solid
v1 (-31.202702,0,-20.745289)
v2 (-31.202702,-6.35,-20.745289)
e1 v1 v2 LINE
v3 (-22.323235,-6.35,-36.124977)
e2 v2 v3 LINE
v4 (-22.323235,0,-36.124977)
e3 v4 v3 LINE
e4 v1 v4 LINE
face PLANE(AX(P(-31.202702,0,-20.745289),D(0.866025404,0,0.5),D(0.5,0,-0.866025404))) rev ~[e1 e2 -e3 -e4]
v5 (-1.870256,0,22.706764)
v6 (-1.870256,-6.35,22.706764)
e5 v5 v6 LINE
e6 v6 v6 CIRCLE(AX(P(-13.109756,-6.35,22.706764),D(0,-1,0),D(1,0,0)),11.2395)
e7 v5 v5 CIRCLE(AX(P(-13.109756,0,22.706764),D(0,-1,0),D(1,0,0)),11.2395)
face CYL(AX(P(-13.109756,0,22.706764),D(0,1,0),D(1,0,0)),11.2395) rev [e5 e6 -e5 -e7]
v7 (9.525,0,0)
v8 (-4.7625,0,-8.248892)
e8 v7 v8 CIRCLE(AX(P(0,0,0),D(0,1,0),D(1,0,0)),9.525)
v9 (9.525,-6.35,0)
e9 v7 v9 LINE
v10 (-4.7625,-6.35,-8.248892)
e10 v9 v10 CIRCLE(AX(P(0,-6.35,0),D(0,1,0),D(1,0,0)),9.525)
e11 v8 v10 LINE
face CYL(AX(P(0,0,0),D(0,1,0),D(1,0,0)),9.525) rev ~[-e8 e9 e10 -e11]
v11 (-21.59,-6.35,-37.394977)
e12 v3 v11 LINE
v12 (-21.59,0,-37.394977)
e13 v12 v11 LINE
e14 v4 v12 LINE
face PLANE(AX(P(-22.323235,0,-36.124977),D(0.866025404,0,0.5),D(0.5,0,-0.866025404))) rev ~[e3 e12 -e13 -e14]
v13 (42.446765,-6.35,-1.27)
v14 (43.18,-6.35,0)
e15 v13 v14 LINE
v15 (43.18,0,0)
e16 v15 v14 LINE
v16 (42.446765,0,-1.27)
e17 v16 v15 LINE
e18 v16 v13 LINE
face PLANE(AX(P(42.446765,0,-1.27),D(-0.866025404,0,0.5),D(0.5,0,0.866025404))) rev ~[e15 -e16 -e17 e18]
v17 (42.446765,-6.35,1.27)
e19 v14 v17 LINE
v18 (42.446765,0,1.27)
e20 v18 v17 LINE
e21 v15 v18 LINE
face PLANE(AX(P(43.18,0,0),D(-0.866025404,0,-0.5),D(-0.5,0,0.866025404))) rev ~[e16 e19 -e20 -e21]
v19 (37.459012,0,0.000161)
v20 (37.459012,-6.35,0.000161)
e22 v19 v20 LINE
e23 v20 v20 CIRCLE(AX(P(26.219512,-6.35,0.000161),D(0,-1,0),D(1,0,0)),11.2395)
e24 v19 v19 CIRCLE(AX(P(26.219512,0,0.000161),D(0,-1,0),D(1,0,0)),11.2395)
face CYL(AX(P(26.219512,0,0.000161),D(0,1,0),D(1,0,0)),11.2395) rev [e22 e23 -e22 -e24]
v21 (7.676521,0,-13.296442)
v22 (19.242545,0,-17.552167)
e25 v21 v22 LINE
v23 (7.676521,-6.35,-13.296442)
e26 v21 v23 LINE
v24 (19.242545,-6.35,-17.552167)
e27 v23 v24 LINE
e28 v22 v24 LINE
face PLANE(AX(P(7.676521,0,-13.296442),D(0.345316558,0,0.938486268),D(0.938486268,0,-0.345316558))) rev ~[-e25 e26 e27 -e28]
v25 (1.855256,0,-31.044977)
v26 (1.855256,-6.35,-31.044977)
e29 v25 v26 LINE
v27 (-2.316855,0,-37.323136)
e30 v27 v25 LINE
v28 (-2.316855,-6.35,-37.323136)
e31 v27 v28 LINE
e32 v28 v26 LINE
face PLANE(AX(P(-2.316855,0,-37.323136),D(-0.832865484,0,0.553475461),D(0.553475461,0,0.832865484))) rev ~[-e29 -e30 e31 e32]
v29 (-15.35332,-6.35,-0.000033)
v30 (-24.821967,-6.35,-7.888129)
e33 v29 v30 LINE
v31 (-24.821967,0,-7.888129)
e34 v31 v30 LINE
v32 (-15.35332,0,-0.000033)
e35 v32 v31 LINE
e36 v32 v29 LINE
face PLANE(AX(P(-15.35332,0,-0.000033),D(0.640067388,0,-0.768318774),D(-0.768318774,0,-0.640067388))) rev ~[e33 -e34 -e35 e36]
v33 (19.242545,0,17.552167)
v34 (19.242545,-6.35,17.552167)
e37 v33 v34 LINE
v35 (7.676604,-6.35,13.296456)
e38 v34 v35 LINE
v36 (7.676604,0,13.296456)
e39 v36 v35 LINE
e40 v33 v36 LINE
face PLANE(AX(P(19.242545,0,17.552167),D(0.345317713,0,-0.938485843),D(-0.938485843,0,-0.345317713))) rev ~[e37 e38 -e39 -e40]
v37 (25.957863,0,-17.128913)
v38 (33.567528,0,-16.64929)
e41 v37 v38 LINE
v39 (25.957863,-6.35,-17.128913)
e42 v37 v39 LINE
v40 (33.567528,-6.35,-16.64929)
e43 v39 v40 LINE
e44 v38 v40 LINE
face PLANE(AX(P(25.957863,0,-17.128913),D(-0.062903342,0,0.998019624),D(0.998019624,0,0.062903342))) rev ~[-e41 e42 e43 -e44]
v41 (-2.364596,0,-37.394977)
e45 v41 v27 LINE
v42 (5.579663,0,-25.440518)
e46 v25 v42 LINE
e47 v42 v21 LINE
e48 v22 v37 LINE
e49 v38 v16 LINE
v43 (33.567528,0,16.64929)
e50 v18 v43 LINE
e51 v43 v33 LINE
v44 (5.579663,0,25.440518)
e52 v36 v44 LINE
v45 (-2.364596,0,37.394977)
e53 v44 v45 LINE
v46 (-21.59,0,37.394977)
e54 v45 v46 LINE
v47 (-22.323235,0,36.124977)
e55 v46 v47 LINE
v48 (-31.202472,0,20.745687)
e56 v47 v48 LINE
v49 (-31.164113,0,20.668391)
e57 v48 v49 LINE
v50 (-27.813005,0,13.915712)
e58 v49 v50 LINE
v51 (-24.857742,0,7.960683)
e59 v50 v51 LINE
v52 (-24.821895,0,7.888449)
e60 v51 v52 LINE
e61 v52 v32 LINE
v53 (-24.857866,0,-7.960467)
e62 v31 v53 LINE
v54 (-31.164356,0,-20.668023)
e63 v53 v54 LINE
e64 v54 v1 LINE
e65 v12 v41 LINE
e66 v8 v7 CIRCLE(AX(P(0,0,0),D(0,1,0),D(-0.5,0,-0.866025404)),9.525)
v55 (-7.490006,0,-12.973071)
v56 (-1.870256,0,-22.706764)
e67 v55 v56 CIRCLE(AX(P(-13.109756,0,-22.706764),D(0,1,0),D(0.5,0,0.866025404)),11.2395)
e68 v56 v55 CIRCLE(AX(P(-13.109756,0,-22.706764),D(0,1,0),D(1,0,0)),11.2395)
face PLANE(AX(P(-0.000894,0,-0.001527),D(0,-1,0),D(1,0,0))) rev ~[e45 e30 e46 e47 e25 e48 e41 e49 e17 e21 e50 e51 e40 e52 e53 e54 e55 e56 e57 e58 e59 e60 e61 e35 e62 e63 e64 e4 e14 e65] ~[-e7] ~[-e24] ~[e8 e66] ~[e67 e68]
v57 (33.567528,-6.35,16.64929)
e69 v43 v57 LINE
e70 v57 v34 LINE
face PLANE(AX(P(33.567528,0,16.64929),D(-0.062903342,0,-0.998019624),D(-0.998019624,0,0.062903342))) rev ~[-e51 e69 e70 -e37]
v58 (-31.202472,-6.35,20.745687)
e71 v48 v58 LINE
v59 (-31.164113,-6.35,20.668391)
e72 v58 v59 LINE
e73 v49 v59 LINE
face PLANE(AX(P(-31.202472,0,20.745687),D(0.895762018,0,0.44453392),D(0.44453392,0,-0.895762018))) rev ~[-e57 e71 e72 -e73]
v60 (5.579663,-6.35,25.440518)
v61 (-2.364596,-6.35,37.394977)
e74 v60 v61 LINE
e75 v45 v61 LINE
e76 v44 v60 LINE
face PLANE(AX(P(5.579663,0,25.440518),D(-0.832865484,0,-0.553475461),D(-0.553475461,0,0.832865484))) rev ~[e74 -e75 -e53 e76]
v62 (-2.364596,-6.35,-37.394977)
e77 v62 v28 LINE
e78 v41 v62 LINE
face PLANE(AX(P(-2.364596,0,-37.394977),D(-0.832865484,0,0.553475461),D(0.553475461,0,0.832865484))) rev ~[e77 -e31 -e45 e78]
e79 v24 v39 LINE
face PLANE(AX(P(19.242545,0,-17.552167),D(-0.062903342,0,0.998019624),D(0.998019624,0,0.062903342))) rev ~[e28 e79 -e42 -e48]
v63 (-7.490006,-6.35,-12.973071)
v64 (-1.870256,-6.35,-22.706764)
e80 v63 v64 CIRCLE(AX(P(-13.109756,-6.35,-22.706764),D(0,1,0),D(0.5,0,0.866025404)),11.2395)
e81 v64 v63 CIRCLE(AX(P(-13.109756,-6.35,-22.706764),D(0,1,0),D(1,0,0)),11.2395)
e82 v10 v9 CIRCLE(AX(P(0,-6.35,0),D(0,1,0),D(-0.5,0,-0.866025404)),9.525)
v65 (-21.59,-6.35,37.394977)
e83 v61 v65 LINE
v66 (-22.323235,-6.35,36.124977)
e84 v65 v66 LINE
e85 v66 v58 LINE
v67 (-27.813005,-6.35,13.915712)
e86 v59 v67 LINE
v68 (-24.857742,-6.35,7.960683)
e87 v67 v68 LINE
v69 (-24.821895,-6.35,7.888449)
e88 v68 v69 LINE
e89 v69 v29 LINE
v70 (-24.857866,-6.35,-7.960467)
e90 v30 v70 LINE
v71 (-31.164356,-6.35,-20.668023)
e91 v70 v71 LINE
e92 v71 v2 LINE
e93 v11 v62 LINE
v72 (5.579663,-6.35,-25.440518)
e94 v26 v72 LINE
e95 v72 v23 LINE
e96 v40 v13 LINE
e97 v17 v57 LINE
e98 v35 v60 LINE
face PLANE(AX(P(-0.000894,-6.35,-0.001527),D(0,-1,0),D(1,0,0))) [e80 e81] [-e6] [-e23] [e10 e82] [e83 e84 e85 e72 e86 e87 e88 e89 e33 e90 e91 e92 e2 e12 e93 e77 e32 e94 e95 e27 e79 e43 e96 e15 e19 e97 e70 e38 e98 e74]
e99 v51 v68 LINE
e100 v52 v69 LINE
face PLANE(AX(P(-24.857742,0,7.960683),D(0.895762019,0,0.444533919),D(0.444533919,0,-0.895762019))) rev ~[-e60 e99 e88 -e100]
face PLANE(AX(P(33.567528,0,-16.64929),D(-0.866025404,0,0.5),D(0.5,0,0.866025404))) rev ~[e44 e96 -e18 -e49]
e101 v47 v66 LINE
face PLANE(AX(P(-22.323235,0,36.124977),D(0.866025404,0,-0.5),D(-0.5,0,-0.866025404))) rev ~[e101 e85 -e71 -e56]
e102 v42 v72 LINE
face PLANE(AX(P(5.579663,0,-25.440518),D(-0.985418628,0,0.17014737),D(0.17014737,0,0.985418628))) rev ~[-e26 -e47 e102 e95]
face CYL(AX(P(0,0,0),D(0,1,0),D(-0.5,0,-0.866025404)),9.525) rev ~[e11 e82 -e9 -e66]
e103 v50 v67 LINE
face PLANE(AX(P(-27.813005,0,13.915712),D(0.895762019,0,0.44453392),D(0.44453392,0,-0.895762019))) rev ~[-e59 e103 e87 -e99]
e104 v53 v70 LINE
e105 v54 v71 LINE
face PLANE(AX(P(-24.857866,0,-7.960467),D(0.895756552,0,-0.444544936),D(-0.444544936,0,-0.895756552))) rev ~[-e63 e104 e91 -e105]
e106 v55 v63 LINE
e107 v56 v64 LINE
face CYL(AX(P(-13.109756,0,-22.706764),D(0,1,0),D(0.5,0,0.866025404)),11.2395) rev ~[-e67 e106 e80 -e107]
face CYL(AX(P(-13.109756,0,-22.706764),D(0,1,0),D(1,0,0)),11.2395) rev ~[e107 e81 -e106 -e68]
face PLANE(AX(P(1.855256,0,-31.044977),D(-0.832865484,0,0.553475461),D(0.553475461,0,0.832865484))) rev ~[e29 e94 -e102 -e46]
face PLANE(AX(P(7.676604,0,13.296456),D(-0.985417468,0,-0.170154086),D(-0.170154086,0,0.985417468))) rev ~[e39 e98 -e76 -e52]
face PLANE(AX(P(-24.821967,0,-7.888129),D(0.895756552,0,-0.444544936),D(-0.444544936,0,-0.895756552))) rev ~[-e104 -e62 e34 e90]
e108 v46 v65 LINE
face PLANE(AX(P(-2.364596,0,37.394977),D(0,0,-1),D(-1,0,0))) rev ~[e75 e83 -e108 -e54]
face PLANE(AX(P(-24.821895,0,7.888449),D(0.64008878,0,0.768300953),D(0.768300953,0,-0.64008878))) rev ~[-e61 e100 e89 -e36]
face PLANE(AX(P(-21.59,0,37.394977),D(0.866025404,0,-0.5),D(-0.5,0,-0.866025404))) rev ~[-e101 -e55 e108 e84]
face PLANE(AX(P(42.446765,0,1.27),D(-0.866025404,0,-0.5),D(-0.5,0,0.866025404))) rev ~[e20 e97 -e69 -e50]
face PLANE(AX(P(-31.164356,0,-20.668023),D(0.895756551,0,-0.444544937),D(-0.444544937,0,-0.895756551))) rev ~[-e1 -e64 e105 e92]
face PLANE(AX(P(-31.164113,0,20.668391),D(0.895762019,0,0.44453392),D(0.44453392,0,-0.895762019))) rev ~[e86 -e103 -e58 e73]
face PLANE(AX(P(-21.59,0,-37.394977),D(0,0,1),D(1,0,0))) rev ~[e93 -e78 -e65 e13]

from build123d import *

# Parameters (mm, degrees)
F0_R     = 11.2395
F1_DEPTH = 6.35


# Not quite as in the source:
# - ends of sketch curves that miss each other by under 0.0002 mm in the source are joined


with BuildPart() as f1:
    # F0 (on Front) → F1 (new body)
    with BuildSketch(Plane.XZ):
        with BuildLine():
            Line((42.4467651581, 1.27), (33.5675281941, 16.6492895541))
            Line((33.5675281941, 16.6492895541), (19.2425445444, 17.5521669359))
            Line((19.2425445444, 17.5521669359), (7.6766035347, 13.2964561731))
            Line((7.6766035347, 13.2964561731), (5.579663063, 25.4405181745))
            Line((5.579663063, 25.4405181745), (-2.3645964913, 37.3949769354))
            Line((-2.3645964913, 37.3949769354), (-20.1235303163, 37.3949769354))
            ThreePointArc((-20.1235303163, 37.3949769354), (-21.3935303163, 37.054681461), (-22.3232348419, 36.1249769354))
            Line((-22.3232348419, 36.1249769354), (-31.2024718059, 20.7456873813))
            Line((-31.2024718059, 20.7456873813), (-31.1641125036, 20.668391129))
            Line((-31.1641125036, 20.668391129), (-27.8130050023, 13.9157122299))
            Line((-27.8130050023, 13.9157122299), (-24.8577417731, 7.960682843))
            Line((-24.8577417731, 7.960682843), (-24.8218947301, 7.8884489409))
            Line((-24.8218947301, 7.8884489409), (-15.353319828, -3.34766e-05))
            Line((-15.353319828, -3.34766e-05), (-24.8219665561, -7.8881291301))
            Line((-24.8219665561, -7.8881291301), (-24.8578663434, -7.9604670809))
            Line((-24.8578663434, -7.9604670809), (-31.1643564099, -20.6680233587))
            Line((-31.1643564099, -20.6680233587), (-31.2027017544, -20.7452890988))
            Line((-31.2027017544, -20.7452890988), (-22.3232348418, -36.1249769356))
            ThreePointArc((-22.3232348418, -36.1249769356), (-21.9195815404, -36.6510281597), (-21.3935303163, -37.0546814611))
            ThreePointArc((-21.3935303163, -37.0546814611), (-20.7809306909, -37.3084285342), (-20.1235303165, -37.3949769354))
            Line((-20.1235303165, -37.3949769354), (-2.3645964913, -37.3949769354))
            Line((-2.3645964913, -37.3949769354), (-2.3168550697, -37.3231360229))
            Line((-2.3168550697, -37.3231360229), (1.8552556307, -31.0449769354))
            Line((1.8552556307, -31.0449769354), (5.579663063, -25.4405181745))
            Line((5.579663063, -25.4405181745), (7.6765207659, -13.2964418818))
            Line((7.6765207659, -13.2964418818), (19.2425445444, -17.5521669359))
            Line((19.2425445444, -17.5521669359), (25.957862804, -17.1289127727))
            Line((25.957862804, -17.1289127727), (33.5675281941, -16.6492895541))
            Line((33.5675281941, -16.6492895541), (42.4467651581, -1.27))
            ThreePointArc((42.4467651581, -1.27), (42.7870606325, 0), (42.4467651581, 1.27))
        make_face()
        with BuildLine():
            ThreePointArc((-1.8702560234, -22.7067635073), (-22.8434485492, -28.3265135073), (-7.4900060234, -12.9730709815))
            ThreePointArc((-7.4900060234, -12.9730709815), (-3.3760634975, -17.0870135073), (-1.8702560234, -22.7067635073))
        make_face(mode=Mode.SUBTRACT)
        with BuildLine():
            ThreePointArc((-4.7625, -8.248891971), (-4.7625, 8.248891971), (9.525, 0))
            ThreePointArc((9.525, 0), (4.7625, -8.248891971), (-4.7625, -8.248891971))
        make_face(mode=Mode.SUBTRACT)
        with Locations((-13.1097560234, 22.7067635073)):
            Circle(F0_R, mode=Mode.SUBTRACT)
        with Locations((26.2195120463, 0.0001612286)):
            Circle(F0_R, mode=Mode.SUBTRACT)
        with BuildLine():
            Line((43.18, 0), (42.4467651581, 1.27))
            ThreePointArc((42.4467651581, 1.27), (42.7870606325, 0), (42.4467651581, -1.27))
            Line((42.4467651581, -1.27), (43.18, 0))
        make_face()
        with BuildLine():
            ThreePointArc((-22.3232348419, 36.1249769354), (-21.3935303163, 37.054681461), (-20.1235303163, 37.3949769354))
            Line((-20.1235303163, 37.3949769354), (-21.59, 37.3949769354))
            Line((-21.59, 37.3949769354), (-22.3232348419, 36.1249769354))
        make_face()
        with BuildLine():
            Line((-21.59, -37.3949769354), (-20.1235303165, -37.3949769354))
            ThreePointArc((-20.1235303165, -37.3949769354), (-20.7809306909, -37.3084285342), (-21.3935303163, -37.0546814611))
            Line((-21.3935303163, -37.0546814611), (-21.59, -37.3949769354))
        make_face()
        with BuildLine():
            Line((-21.59, -37.3949769354), (-21.3935303163, -37.0546814611))
            ThreePointArc((-21.3935303163, -37.0546814611), (-21.9195815404, -36.6510281597), (-22.3232348418, -36.1249769356))
            Line((-22.3232348418, -36.1249769356), (-21.59, -37.3949769354))
        make_face()
    extrude(amount=F1_DEPTH)


solid = f1.part
